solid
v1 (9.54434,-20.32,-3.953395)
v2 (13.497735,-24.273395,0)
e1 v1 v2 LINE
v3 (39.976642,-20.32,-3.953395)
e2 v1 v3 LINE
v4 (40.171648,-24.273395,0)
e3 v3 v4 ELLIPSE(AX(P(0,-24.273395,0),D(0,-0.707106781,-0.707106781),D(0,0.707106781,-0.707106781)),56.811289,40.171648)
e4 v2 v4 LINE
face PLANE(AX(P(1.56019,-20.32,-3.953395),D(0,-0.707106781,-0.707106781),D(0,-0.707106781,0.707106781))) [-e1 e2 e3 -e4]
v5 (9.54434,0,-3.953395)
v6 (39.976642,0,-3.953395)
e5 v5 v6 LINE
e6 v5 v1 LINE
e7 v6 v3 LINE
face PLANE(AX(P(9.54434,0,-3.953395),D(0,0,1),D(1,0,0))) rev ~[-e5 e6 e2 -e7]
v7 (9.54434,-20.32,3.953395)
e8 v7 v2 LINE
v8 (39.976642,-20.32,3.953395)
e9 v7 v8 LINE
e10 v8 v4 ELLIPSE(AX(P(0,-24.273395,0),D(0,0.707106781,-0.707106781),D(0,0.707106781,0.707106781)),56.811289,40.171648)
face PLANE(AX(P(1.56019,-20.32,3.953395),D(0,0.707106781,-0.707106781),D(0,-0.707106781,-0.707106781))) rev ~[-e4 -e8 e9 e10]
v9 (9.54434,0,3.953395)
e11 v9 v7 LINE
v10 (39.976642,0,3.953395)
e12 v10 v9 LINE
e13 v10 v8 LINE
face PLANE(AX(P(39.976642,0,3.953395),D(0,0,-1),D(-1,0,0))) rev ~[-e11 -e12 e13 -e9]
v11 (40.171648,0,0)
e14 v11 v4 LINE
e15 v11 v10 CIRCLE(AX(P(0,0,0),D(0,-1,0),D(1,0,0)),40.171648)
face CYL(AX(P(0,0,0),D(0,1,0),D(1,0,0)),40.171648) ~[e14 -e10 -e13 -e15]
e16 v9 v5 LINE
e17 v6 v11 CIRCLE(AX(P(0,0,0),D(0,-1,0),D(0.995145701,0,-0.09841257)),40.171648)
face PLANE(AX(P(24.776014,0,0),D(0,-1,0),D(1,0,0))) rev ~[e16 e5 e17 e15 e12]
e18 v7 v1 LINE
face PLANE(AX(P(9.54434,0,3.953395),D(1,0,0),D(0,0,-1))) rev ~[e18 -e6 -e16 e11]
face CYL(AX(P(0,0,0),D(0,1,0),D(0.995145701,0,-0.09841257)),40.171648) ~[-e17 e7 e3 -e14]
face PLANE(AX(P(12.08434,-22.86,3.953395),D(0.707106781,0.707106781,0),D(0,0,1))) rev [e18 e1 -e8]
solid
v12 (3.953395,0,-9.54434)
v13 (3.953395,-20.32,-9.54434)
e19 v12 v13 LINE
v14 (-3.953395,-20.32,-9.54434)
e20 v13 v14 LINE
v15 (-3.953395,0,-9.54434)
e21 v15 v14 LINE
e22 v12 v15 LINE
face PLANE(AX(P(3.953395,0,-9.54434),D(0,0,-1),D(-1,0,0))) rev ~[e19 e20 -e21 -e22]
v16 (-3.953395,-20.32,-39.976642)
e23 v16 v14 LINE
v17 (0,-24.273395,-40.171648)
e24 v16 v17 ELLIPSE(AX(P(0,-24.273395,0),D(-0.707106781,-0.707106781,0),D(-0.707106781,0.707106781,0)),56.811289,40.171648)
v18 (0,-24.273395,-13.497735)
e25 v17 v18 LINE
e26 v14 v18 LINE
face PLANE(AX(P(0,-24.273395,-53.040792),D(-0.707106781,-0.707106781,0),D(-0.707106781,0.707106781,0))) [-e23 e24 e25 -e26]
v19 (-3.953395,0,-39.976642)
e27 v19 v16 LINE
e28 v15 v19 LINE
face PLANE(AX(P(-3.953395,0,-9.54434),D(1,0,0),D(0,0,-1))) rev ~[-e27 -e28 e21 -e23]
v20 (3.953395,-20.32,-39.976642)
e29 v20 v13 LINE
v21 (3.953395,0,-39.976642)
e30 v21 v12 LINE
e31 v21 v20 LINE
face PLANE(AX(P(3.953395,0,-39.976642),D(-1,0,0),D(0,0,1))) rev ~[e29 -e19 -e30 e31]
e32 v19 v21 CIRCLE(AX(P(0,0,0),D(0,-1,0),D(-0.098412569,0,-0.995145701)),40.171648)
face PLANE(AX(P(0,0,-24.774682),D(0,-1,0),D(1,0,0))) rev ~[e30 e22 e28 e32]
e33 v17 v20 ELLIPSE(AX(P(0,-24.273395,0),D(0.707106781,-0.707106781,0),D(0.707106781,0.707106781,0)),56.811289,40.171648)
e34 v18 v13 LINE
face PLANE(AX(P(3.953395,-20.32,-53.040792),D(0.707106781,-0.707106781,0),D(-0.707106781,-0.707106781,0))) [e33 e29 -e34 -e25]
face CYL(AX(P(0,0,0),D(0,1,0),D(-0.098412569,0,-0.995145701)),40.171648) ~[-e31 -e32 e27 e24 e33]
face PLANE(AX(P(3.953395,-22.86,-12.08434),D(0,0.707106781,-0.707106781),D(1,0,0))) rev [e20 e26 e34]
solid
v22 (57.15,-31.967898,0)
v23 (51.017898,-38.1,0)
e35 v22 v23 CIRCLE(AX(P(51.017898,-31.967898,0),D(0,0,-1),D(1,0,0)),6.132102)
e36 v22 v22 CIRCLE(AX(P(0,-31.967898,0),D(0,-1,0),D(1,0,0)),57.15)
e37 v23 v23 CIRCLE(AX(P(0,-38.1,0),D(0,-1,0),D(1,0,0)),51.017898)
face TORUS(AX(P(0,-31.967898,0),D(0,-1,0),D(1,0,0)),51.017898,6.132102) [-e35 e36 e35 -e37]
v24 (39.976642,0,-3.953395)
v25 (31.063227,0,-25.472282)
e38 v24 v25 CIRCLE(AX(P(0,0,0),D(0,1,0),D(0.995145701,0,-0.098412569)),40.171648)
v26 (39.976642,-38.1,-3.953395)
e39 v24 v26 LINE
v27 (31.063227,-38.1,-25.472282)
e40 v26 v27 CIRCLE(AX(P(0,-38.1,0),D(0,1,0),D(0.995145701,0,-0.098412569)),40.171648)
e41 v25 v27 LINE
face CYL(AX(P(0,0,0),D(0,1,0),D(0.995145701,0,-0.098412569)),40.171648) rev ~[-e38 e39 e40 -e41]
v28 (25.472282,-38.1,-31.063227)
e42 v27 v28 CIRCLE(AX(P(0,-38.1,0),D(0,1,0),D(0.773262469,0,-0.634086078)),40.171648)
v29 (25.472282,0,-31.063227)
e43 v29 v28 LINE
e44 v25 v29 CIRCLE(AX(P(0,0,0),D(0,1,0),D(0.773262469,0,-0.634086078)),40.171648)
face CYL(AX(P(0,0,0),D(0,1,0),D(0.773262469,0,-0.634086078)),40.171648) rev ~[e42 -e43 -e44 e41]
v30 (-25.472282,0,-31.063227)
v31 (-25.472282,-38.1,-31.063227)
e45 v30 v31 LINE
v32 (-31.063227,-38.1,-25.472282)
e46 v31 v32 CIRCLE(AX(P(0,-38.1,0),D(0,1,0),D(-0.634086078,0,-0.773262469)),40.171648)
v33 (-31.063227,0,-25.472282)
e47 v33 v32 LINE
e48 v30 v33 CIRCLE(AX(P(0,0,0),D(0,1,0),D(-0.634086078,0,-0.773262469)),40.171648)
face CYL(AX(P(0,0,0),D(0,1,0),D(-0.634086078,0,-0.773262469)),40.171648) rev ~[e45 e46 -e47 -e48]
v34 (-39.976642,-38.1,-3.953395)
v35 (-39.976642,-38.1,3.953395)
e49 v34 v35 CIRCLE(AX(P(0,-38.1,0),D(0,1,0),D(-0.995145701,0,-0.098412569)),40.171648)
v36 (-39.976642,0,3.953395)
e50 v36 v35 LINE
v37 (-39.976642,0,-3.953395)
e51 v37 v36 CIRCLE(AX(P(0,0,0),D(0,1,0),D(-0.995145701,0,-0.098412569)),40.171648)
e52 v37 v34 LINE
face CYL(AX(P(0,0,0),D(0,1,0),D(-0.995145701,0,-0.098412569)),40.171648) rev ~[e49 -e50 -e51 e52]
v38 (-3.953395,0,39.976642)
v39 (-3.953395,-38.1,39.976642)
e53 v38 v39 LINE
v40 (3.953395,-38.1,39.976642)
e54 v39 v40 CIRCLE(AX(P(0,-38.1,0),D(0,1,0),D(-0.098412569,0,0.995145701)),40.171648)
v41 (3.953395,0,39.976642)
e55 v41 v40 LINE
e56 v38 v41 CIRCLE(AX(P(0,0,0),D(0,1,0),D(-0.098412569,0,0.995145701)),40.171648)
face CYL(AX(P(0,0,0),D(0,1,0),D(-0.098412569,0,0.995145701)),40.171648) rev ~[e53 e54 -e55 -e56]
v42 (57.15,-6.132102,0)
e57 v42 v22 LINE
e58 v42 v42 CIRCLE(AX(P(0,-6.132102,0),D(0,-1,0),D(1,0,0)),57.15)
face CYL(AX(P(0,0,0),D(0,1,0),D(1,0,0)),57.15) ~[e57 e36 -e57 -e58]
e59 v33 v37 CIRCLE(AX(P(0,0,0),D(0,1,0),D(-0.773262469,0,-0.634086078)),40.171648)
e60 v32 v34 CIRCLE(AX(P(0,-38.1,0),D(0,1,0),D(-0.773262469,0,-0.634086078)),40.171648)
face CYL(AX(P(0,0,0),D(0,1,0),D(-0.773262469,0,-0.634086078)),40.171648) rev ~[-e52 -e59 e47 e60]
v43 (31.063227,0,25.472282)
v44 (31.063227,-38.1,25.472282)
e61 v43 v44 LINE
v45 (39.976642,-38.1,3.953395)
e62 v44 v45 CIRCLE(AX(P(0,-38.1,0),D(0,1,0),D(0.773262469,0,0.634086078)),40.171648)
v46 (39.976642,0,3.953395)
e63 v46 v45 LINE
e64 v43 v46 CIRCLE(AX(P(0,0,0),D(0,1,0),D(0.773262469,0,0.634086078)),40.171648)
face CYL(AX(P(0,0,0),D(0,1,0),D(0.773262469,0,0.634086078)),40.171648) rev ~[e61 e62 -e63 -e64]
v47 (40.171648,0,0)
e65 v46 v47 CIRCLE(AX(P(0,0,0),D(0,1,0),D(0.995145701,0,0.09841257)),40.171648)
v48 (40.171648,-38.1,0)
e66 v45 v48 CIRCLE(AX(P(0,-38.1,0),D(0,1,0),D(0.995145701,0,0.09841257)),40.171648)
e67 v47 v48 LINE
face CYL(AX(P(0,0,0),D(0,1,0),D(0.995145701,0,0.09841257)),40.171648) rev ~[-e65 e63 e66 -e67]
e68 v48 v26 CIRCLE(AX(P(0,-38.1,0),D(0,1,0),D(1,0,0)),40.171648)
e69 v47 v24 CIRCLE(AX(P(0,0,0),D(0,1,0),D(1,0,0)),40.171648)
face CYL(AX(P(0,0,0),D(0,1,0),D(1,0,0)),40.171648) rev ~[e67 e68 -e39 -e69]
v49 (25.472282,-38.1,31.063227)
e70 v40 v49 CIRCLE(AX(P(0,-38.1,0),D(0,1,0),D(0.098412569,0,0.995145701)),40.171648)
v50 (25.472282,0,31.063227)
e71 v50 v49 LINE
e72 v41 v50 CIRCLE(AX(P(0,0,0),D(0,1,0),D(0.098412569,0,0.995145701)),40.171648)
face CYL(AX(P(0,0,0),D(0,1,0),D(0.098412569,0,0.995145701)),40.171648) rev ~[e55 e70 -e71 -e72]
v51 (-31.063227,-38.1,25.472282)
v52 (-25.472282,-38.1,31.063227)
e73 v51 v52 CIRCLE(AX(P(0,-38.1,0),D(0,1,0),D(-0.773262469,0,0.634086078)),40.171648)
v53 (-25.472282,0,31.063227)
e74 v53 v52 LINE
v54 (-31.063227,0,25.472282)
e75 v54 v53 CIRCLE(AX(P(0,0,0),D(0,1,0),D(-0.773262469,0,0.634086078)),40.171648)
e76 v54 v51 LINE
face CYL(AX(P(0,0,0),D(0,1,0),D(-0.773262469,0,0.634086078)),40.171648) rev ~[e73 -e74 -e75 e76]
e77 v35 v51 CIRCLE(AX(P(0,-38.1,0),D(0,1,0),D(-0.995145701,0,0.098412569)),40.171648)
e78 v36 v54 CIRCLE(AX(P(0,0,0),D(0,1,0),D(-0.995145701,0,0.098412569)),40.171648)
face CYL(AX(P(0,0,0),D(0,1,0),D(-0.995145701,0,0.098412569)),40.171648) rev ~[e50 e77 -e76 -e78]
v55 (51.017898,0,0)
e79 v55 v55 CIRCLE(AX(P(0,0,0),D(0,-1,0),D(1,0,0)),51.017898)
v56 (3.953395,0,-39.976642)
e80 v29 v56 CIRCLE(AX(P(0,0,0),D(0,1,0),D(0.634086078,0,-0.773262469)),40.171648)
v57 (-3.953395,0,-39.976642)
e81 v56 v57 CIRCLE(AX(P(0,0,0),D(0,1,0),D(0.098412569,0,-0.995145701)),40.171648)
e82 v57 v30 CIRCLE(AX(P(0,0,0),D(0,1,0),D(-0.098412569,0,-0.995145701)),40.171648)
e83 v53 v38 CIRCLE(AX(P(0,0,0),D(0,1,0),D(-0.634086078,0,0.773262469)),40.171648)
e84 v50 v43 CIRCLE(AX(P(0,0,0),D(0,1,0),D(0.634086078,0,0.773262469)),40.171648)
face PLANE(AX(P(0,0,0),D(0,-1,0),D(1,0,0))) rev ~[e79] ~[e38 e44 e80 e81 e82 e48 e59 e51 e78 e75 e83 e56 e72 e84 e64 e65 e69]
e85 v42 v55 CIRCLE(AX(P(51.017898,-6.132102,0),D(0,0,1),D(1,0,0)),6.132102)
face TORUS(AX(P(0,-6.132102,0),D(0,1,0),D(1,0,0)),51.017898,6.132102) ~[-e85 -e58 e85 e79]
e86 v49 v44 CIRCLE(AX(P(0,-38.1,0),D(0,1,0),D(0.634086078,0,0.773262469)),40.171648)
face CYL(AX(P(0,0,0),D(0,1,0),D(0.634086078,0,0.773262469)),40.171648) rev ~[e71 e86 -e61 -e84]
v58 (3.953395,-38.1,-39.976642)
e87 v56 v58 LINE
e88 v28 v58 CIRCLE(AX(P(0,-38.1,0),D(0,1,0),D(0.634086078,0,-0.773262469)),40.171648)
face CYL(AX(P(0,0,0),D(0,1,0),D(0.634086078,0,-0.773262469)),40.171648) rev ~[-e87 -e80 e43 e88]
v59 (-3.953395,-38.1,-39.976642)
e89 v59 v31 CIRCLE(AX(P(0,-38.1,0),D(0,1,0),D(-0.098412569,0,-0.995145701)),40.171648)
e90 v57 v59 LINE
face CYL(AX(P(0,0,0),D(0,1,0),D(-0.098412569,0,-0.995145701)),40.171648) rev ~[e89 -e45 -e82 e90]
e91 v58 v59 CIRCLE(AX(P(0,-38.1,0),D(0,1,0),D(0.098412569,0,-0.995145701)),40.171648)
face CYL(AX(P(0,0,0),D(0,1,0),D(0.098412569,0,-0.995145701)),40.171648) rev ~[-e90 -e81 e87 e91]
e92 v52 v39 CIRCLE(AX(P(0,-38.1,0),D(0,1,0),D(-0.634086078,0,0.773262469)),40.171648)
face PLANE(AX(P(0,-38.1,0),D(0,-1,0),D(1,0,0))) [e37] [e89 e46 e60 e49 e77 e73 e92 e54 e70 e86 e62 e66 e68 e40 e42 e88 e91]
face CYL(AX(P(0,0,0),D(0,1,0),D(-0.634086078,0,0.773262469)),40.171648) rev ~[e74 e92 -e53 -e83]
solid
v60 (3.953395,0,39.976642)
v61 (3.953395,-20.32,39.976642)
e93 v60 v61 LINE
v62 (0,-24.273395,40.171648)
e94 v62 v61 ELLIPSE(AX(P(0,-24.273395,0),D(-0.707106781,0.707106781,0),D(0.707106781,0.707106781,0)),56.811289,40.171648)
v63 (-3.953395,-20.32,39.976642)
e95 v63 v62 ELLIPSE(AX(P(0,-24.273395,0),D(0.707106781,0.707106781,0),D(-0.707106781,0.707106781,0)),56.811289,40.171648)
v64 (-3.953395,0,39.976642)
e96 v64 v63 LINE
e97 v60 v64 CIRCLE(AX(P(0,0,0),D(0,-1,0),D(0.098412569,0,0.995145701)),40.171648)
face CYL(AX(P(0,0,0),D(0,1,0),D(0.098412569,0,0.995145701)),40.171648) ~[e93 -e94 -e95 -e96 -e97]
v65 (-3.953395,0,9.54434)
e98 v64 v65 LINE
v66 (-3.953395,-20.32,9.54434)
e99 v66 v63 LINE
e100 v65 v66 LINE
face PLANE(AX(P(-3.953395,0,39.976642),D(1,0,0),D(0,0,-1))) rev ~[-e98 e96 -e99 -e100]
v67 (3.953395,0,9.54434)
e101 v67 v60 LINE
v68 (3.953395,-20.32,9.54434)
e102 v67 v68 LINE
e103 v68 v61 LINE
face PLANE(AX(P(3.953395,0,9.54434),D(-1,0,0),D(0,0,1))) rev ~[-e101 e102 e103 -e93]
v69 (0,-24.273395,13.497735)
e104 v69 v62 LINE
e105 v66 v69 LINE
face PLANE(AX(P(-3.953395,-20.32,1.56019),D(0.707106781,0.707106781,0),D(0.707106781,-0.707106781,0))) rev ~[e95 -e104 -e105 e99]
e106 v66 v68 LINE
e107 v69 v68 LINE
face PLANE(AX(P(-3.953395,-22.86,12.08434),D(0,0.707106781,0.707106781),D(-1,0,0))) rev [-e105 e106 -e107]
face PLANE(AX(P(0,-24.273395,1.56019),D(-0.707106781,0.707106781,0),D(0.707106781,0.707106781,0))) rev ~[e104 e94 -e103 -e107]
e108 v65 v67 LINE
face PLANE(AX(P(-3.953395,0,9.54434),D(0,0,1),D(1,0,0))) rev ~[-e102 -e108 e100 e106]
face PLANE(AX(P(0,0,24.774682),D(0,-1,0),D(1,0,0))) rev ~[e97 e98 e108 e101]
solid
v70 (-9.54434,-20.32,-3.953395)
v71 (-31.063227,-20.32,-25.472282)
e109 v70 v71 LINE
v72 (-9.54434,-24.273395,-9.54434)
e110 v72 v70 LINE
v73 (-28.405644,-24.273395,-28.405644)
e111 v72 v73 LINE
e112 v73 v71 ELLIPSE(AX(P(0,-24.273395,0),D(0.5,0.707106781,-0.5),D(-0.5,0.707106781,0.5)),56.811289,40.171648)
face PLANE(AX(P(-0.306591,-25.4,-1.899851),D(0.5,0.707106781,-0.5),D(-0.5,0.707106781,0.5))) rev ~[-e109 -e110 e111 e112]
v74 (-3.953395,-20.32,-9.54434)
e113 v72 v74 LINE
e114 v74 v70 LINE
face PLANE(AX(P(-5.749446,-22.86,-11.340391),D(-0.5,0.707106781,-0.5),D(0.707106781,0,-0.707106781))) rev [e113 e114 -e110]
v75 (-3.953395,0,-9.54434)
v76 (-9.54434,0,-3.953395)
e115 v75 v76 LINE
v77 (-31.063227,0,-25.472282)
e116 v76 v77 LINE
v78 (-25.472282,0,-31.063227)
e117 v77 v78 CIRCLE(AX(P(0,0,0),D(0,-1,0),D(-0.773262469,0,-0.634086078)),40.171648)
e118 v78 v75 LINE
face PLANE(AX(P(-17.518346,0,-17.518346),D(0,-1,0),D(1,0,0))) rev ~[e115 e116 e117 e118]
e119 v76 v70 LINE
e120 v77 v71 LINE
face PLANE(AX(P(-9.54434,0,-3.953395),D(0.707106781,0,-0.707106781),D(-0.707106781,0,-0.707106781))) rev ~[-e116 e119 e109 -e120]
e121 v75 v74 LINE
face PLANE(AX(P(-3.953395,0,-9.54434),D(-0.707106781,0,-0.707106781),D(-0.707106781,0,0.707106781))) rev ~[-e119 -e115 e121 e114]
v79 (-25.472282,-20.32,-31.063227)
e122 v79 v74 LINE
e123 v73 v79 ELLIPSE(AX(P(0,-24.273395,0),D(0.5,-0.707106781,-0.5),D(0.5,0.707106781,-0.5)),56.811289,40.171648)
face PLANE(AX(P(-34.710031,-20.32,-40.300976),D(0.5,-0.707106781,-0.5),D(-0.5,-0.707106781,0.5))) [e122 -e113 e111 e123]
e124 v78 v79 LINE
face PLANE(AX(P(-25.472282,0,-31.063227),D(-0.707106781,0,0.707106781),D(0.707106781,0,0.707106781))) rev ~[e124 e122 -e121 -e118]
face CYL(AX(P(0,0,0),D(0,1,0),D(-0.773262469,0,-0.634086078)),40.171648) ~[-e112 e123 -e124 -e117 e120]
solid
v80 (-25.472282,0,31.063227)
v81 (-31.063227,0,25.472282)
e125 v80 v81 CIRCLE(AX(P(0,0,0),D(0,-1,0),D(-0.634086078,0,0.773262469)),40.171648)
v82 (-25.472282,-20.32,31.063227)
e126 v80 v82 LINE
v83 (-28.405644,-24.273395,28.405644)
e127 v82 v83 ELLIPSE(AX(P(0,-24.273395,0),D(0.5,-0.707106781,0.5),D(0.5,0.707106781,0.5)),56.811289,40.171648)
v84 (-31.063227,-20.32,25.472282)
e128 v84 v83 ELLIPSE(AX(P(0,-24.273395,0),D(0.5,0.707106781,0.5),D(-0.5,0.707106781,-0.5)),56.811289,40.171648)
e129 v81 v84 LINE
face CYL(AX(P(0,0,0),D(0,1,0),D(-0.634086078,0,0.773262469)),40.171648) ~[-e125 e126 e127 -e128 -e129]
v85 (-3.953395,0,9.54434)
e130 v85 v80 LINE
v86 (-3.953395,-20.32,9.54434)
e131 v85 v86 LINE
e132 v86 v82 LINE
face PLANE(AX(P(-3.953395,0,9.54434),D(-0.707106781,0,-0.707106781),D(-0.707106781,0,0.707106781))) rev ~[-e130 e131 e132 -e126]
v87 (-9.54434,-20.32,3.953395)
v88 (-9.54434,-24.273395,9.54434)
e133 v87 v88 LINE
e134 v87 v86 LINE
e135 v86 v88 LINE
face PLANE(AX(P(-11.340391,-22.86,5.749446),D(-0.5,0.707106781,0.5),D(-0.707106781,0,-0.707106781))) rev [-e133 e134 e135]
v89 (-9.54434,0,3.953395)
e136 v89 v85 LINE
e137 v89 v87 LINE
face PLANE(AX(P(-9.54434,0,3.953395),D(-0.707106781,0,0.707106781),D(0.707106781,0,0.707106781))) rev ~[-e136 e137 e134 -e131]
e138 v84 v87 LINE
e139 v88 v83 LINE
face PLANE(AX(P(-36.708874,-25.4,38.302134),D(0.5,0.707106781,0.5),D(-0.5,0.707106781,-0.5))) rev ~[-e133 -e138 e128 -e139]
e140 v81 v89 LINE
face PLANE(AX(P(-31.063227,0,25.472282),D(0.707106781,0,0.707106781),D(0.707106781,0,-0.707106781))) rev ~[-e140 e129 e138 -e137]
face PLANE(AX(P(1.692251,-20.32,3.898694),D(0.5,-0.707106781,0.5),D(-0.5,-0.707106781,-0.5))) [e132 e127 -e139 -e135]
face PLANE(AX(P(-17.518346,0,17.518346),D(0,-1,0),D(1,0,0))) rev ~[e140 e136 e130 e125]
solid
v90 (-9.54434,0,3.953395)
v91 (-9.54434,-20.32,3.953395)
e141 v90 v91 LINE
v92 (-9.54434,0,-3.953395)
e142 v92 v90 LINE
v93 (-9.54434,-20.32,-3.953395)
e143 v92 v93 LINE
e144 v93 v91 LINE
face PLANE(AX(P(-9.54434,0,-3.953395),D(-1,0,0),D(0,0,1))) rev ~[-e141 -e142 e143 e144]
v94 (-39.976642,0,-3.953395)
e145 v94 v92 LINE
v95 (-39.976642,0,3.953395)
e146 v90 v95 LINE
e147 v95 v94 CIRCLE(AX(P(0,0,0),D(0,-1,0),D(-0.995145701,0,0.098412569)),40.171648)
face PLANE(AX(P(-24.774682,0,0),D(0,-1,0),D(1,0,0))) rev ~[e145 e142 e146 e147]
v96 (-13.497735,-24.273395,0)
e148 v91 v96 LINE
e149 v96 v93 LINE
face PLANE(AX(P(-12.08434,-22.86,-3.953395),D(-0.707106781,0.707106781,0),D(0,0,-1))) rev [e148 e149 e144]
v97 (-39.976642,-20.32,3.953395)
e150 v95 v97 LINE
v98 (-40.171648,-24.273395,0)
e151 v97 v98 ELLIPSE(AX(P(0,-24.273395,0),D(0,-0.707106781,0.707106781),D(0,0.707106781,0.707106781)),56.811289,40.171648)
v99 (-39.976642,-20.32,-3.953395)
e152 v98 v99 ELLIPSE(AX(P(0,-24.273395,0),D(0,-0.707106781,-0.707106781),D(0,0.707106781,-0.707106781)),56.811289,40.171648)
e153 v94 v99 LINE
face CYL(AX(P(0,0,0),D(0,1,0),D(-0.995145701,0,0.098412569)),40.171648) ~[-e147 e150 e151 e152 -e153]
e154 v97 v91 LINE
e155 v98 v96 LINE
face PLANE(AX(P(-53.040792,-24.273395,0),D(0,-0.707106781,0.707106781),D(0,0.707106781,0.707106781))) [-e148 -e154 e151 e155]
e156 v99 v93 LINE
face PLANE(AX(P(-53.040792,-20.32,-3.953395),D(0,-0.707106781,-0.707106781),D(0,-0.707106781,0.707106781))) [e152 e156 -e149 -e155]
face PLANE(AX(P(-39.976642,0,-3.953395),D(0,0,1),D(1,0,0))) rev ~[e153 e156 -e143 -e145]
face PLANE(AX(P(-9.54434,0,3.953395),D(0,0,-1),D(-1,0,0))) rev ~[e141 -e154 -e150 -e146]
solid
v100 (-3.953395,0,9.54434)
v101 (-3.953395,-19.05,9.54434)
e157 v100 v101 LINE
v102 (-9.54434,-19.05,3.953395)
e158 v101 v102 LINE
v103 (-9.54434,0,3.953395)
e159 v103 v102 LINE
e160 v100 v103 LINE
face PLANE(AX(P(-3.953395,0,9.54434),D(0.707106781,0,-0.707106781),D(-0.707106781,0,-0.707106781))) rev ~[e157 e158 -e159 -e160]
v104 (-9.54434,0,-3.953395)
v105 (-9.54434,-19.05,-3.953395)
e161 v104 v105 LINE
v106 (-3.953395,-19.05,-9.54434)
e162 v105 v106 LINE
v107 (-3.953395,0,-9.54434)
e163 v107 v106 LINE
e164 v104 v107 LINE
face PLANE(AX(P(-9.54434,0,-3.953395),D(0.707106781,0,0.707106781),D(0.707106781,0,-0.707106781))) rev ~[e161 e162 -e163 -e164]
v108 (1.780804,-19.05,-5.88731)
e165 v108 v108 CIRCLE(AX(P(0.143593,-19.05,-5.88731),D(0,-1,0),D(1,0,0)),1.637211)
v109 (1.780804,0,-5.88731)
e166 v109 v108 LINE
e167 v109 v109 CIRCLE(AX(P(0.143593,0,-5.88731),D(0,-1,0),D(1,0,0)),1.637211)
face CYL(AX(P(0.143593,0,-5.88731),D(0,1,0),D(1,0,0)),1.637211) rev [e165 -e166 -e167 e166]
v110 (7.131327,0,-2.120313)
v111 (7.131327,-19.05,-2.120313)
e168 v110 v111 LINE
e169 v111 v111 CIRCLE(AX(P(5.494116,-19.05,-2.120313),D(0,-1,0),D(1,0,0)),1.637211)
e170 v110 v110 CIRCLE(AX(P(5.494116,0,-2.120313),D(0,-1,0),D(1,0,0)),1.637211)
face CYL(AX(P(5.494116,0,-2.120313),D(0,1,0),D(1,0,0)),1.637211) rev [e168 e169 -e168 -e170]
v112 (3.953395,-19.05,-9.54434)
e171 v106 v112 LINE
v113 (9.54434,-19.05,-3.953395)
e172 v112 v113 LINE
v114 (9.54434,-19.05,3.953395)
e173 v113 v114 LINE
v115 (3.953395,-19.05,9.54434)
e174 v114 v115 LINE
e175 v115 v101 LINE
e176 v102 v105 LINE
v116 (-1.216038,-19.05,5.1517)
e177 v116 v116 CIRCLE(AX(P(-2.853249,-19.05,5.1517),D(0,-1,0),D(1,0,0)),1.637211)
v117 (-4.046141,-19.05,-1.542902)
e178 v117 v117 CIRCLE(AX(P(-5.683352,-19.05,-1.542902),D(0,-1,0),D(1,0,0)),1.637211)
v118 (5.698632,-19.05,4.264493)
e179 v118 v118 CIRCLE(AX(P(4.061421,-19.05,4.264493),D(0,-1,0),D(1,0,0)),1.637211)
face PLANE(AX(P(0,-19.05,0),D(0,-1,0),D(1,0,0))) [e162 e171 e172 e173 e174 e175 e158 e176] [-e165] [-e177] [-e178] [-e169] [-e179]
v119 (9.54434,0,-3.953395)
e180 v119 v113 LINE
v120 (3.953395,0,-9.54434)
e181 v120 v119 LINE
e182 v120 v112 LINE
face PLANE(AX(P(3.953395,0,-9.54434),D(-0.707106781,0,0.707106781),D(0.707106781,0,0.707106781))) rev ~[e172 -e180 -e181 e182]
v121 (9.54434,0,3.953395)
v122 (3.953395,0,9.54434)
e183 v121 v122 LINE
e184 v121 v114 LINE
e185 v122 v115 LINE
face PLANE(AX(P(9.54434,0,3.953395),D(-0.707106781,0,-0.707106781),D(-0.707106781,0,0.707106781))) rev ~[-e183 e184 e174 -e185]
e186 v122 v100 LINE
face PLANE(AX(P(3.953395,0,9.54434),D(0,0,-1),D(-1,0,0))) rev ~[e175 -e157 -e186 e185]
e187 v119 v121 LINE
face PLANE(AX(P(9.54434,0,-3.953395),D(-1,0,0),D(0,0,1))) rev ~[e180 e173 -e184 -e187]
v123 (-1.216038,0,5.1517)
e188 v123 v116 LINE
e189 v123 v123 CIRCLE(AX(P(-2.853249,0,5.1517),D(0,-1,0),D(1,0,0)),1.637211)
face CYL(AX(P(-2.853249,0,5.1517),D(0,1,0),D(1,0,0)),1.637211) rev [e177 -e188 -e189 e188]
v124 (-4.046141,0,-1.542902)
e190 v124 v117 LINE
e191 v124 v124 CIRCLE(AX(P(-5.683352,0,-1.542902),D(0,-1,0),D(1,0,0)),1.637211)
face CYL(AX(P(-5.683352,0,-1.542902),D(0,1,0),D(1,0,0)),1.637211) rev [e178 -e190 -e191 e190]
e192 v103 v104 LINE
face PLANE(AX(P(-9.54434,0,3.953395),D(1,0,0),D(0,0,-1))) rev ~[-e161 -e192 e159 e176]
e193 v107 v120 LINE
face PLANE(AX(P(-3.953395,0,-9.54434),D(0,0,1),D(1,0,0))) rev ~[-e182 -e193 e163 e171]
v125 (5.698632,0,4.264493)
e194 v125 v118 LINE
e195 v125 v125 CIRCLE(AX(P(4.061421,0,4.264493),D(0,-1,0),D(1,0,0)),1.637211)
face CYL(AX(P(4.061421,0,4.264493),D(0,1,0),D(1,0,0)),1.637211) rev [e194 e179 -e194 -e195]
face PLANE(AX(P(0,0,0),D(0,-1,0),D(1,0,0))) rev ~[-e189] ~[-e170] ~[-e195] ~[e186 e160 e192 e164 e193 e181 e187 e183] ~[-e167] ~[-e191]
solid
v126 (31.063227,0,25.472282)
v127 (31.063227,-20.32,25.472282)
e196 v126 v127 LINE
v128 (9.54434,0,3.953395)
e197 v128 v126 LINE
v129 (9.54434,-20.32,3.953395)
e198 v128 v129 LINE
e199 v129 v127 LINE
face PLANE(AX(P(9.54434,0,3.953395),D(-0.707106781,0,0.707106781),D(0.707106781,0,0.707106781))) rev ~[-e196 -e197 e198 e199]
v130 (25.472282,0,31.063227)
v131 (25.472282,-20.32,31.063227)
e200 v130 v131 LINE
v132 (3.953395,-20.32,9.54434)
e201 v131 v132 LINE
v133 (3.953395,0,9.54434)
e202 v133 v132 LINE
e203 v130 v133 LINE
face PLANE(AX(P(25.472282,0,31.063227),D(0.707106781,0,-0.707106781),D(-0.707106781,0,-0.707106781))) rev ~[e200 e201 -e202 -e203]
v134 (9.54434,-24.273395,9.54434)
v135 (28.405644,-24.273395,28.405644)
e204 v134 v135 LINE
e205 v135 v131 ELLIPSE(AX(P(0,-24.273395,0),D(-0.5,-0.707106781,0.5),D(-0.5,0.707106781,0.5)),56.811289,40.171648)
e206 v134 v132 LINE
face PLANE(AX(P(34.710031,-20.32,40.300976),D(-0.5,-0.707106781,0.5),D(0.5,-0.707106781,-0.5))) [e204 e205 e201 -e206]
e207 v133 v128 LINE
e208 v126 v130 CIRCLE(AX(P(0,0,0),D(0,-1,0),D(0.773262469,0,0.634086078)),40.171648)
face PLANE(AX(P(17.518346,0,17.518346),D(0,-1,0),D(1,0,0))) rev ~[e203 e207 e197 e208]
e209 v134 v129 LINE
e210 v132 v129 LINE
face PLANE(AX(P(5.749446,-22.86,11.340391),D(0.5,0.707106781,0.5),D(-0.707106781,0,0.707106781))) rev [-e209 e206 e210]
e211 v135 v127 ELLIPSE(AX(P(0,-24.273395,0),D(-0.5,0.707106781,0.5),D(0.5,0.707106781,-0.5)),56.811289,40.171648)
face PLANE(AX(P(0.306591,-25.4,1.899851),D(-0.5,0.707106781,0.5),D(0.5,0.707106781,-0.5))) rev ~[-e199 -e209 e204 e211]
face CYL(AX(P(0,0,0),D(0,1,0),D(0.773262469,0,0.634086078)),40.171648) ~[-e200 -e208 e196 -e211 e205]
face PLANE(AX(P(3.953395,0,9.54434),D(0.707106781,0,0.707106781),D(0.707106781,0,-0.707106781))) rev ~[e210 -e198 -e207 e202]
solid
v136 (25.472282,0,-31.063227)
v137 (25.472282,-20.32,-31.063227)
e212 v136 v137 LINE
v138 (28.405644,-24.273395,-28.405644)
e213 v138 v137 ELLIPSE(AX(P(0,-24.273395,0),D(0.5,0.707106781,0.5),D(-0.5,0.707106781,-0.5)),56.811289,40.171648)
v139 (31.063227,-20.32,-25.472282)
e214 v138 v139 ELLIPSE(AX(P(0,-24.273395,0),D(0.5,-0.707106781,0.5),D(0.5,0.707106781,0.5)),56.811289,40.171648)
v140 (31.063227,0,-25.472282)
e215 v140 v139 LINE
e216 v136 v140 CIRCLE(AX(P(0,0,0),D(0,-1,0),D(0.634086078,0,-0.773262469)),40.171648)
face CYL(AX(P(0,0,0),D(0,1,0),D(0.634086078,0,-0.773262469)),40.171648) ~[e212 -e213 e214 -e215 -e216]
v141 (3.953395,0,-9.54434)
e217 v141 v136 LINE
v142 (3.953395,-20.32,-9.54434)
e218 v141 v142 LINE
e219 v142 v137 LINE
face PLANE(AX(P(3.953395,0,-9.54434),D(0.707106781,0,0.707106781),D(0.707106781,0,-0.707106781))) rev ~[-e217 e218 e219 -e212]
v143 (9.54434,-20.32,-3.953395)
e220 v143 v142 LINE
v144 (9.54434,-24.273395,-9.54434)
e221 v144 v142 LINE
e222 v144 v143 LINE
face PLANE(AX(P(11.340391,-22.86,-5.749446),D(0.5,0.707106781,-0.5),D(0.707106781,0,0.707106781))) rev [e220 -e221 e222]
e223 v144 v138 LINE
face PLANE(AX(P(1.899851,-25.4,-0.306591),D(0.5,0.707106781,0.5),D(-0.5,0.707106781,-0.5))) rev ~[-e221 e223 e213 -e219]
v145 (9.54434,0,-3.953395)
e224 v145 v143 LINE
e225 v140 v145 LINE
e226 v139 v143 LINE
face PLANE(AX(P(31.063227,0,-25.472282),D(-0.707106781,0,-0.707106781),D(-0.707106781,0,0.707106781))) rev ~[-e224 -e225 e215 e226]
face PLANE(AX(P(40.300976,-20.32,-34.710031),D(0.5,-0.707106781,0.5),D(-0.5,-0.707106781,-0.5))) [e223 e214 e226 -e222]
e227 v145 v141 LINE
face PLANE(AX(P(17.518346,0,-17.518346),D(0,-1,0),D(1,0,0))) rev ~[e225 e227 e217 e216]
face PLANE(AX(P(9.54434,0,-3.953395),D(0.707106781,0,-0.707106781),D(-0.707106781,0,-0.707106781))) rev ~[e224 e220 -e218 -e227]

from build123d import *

# Parameters (mm, degrees)
F0_R          = 57.15
F1_DEPTH      = 38.1
F2_DEPTH      = 25.4
F0_R_2        = 1.6372110105
F3_DEPTH      = 19.05
F4_R          = 6.1321024484
F5_SIZE       = 5.08
F5_2_SIZE     = 5.08
F5_3_SIZE     = 5.08
F5_4_SIZE     = 5.08
F5_5_SIZE     = 5.08
F5_6_SIZE     = 5.08
F5_7_SIZE     = 5.08
F5_8_SIZE     = 5.08
F6_T1_DEPTH   = 51.4806015581
F6_2_T1_DEPTH = 51.4806015581
F6_2_T3_DEPTH = 51.4806015581
F6_3_T1_DEPTH = 51.4806015581
F6_4_T1_DEPTH = 51.4806015581
F6_4_T3_DEPTH = 51.4806015581
F6_5_T1_DEPTH = 51.4806015581
F6_6_T1_DEPTH = 51.4806015581
F6_6_T3_DEPTH = 51.4806015581
F6_7_T1_DEPTH = 51.4806015581
F6_8_T1_DEPTH = 51.4806015581
F6_8_T3_DEPTH = 51.4806015581


# Not quite as in the source:
# - a fillet or chamfer that OpenCascade refuses, or shapes differently, is made with other operations: its cross-section is extruded or revolved along the edge and cut away or added


with BuildPart() as f1:
    # F0 (on Front) → F1 (new body)
    with BuildSketch(Plane.XZ):
        Circle(F0_R)
        with BuildLine():
            ThreePointArc((39.9766423626, 3.9533950563), (40.1228666372, 1.979100774), (40.1716475522, 0))
            ThreePointArc((40.1716475522, 0), (40.1228666372, -1.979100774), (39.9766423626, -3.9533950563))
            ThreePointArc((39.9766423626, -3.9533950563), (37.1137629608, -15.3730239691), (31.0632273567, -25.4722824507))
            ThreePointArc((31.0632273567, -25.4722824507), (28.4056443956, -28.4056443956), (25.4722824507, -31.0632273567))
            ThreePointArc((25.4722824507, -31.0632273567), (15.3730239691, -37.1137629608), (3.9533950563, -39.9766423626))
            ThreePointArc((3.9533950563, -39.9766423626), (0, -40.1716475522), (-3.9533950563, -39.9766423626))
            ThreePointArc((-3.9533950563, -39.9766423626), (-15.3730239691, -37.1137629608), (-25.4722824507, -31.0632273567))
            ThreePointArc((-25.4722824507, -31.0632273567), (-28.4056443956, -28.4056443956), (-31.0632273567, -25.4722824507))
            ThreePointArc((-31.0632273567, -25.4722824507), (-37.1137629608, -15.3730239691), (-39.9766423626, -3.9533950563))
            ThreePointArc((-39.9766423626, -3.9533950563), (-40.1716475522, 0), (-39.9766423626, 3.9533950563))
            ThreePointArc((-39.9766423626, 3.9533950563), (-37.1137629608, 15.3730239691), (-31.0632273567, 25.4722824507))
            ThreePointArc((-31.0632273567, 25.4722824507), (-28.4056443956, 28.4056443956), (-25.4722824507, 31.0632273567))
            ThreePointArc((-25.4722824507, 31.0632273567), (-15.3730239691, 37.1137629608), (-3.9533950563, 39.9766423626))
            ThreePointArc((-3.9533950563, 39.9766423626), (0, 40.1716475522), (3.9533950563, 39.9766423626))
            ThreePointArc((3.9533950563, 39.9766423626), (15.3730239691, 37.1137629608), (25.4722824507, 31.0632273567))
            ThreePointArc((25.4722824507, 31.0632273567), (28.4056443956, 28.4056443956), (31.0632273567, 25.4722824507))
            ThreePointArc((31.0632273567, 25.4722824507), (37.1137629608, 15.3730239691), (39.9766423626, 3.9533950563))
        make_face(mode=Mode.SUBTRACT)
    extrude(amount=F1_DEPTH)

    # F4
    f4_edges = [f1.edges().sort_by_distance(p)[0] for p in [
        (-57.15, -38.1, 0),
        (-57.15, 0, 0),
    ]]
    fillet(f4_edges, radius=F4_R)


with BuildPart() as f2:
    # F0 (on Front) → F2 (new body)
    with BuildSketch(Plane.XZ):
        with BuildLine():
            Line((-9.5443399623, -3.9533950563), (-9.5443399623, 3.9533950563))
            Line((-9.5443399623, 3.9533950563), (-39.9766423626, 3.9533950563))
            ThreePointArc((-39.9766423626, 3.9533950563), (-40.1716475522, 0), (-39.9766423626, -3.9533950563))
            Line((-39.9766423626, -3.9533950563), (-9.5443399623, -3.9533950563))
        make_face()
    extrude(amount=F2_DEPTH)

    # F5#4
    f5_4_edges = [f2.edges().sort_by_distance(p)[0] for p in [
        (-9.54434, -25.4, 0),
    ]]
    chamfer(f5_4_edges, length=F5_4_SIZE)

    # F6#3: chamfer of 5.08 on 2 edges, made by hand

    # F6_3_s2 → F6_3_t1 (cut)
    with BuildSketch(Plane.YZ.offset(-53.0407919415)):
        Polygon((-25.4, -1.1266049437), (-20.32, 3.9533950563), (-25.4, 3.9533950563), align=None)
        Polygon((-20.32, -3.9533950563), (-25.4, 1.1266049437), (-25.4, -3.9533950563), align=None)
    extrude(amount=F6_3_T1_DEPTH, mode=Mode.SUBTRACT)


with BuildPart() as f2b:
    # F0 (on Front) → F2, piece 2 (new body)
    with BuildSketch(Plane.XZ):
        with BuildLine():
            Line((-9.5443399623, 3.9533950563), (-3.9533950563, 9.5443399623))
            Line((-3.9533950563, 9.5443399623), (-25.4722824507, 31.0632273567))
            ThreePointArc((-25.4722824507, 31.0632273567), (-28.4056443956, 28.4056443956), (-31.0632273567, 25.4722824507))
            Line((-31.0632273567, 25.4722824507), (-9.5443399623, 3.9533950563))
        make_face()
    extrude(amount=F2_DEPTH)

    # F5#3
    f5_3_edges = [f2b.edges().sort_by_distance(p)[0] for p in [
        (-6.748868, -25.4, 6.748868),
    ]]
    chamfer(f5_3_edges, length=F5_3_SIZE)

    # F6#2: chamfer of 5.08 on 2 edges, made by hand

    # F6_2_s2 → F6_2_t1 (cut)
    with BuildSketch(Plane(origin=(-1.1032212001, 0, 1.1032212001), x_dir=(0, 1, 0), z_dir=(-0.7071067812, 0, 0.7071067812))):
        Polygon((-20.32, -3.9533950563), (-25.4, 1.1266049437), (-25.4, -3.9533950563), align=None)
    extrude(amount=F6_2_T1_DEPTH, mode=Mode.SUBTRACT)

    # F6_2_s4 → F6_2_t3 (cut)
    with BuildSketch(Plane(origin=(-37.5055036613, 0, 37.5055036613), x_dir=(0, 1, 0), z_dir=(0.7071067812, 0, -0.7071067812))):
        Polygon((-25.4, 1.1266049437), (-20.32, -3.9533950563), (-25.4, -3.9533950563), align=None)
    extrude(amount=F6_2_T3_DEPTH, mode=Mode.SUBTRACT)


with BuildPart() as f2c:
    # F0 (on Front) → F2, piece 3 (new body)
    with BuildSketch(Plane.XZ):
        with BuildLine():
            Line((9.5443399623, 3.9533950563), (31.0632273567, 25.4722824507))
            ThreePointArc((31.0632273567, 25.4722824507), (28.4056443956, 28.4056443956), (25.4722824507, 31.0632273567))
            Line((25.4722824507, 31.0632273567), (3.9533950563, 9.5443399623))
            Line((3.9533950563, 9.5443399623), (9.5443399623, 3.9533950563))
        make_face()
    extrude(amount=F2_DEPTH)

    # F5
    f5_edges = [f2c.edges().sort_by_distance(p)[0] for p in [
        (6.748868, -25.4, 6.748868),
    ]]
    chamfer(f5_edges, length=F5_SIZE)

    # F6#8: chamfer of 5.08 on 2 edges, made by hand

    # F6_8_s2 → F6_8_t1 (cut)
    with BuildSketch(Plane(origin=(1.1032212001, 0, 1.1032212001), x_dir=(0, 1, 0), z_dir=(0.7071067812, 0, 0.7071067812))):
        Polygon((-25.4, 1.1266049437), (-20.32, -3.9533950563), (-25.4, -3.9533950563), align=None)
    extrude(amount=F6_8_T1_DEPTH, mode=Mode.SUBTRACT)

    # F6_8_s4 → F6_8_t3 (cut)
    with BuildSketch(Plane(origin=(37.5055036613, 0, 37.5055036613), x_dir=(0, 1, 0), z_dir=(-0.7071067812, 0, -0.7071067812))):
        Polygon((-20.32, -3.9533950563), (-25.4, 1.1266049437), (-25.4, -3.9533950563), align=None)
    extrude(amount=F6_8_T3_DEPTH, mode=Mode.SUBTRACT)


with BuildPart() as f2d:
    # F0 (on Front) → F2, piece 4 (new body)
    with BuildSketch(Plane.XZ):
        with BuildLine():
            Line((-3.9533950563, 9.5443399623), (3.9533950563, 9.5443399623))
            Line((3.9533950563, 9.5443399623), (3.9533950563, 39.9766423626))
            ThreePointArc((3.9533950563, 39.9766423626), (0, 40.1716475522), (-3.9533950563, 39.9766423626))
            Line((-3.9533950563, 39.9766423626), (-3.9533950563, 9.5443399623))
        make_face()
    extrude(amount=F2_DEPTH)

    # F5#2
    f5_2_edges = [f2d.edges().sort_by_distance(p)[0] for p in [
        (0, -25.4, 9.54434),
    ]]
    chamfer(f5_2_edges, length=F5_2_SIZE)

    # F6: chamfer of 5.08 on 2 edges, made by hand

    # F6_s2 → F6_t1 (cut)
    with BuildSketch(Plane.XY.offset(1.5601903834)):
        Polygon((-3.9533950563, -20.32), (1.1266049437, -25.4), (-3.9533950563, -25.4), align=None)
        Polygon((-1.1266049437, -25.4), (3.9533950563, -20.32), (3.9533950563, -25.4), align=None)
    extrude(amount=F6_T1_DEPTH, mode=Mode.SUBTRACT)


with BuildPart() as f2e:
    # F0 (on Front) → F2, piece 5 (new body)
    with BuildSketch(Plane.XZ):
        with BuildLine():
            ThreePointArc((39.9766423626, -3.9533950563), (40.1228666372, -1.979100774), (40.1716475522, 0))
            ThreePointArc((40.1716475522, 0), (40.1228666372, 1.979100774), (39.9766423626, 3.9533950563))
            Line((39.9766423626, 3.9533950563), (9.5443399623, 3.9533950563))
            Line((9.5443399623, 3.9533950563), (9.5443399623, -3.9533950563))
            Line((9.5443399623, -3.9533950563), (39.9766423626, -3.9533950563))
        make_face()
    extrude(amount=F2_DEPTH)

    # F5#8
    f5_8_edges = [f2e.edges().sort_by_distance(p)[0] for p in [
        (9.54434, -25.4, 0),
    ]]
    chamfer(f5_8_edges, length=F5_8_SIZE)

    # F6#7: chamfer of 5.08 on 2 edges, made by hand

    # F6_7_s2 → F6_7_t1 (cut)
    with BuildSketch(Plane.YZ.offset(1.5601903834)):
        Polygon((-20.32, -3.9533950563), (-25.4, 1.1266049437), (-25.4, -3.9533950563), align=None)
        Polygon((-20.32, 3.9533950563), (-25.4, -1.1266049437), (-25.4, 3.9533950563), align=None)
    extrude(amount=F6_7_T1_DEPTH, mode=Mode.SUBTRACT)


with BuildPart() as f2f:
    # F0 (on Front) → F2, piece 6 (new body)
    with BuildSketch(Plane.XZ):
        with BuildLine():
            ThreePointArc((25.4722824507, -31.0632273567), (28.4056443956, -28.4056443956), (31.0632273567, -25.4722824507))
            Line((31.0632273567, -25.4722824507), (9.5443399623, -3.9533950563))
            Line((9.5443399623, -3.9533950563), (3.9533950563, -9.5443399623))
            Line((3.9533950563, -9.5443399623), (25.4722824507, -31.0632273567))
        make_face()
    extrude(amount=F2_DEPTH)

    # F5#7
    f5_7_edges = [f2f.edges().sort_by_distance(p)[0] for p in [
        (6.748868, -25.4, -6.748868),
    ]]
    chamfer(f5_7_edges, length=F5_7_SIZE)

    # F6#6: chamfer of 5.08 on 2 edges, made by hand

    # F6_6_s2 → F6_6_t1 (cut)
    with BuildSketch(Plane(origin=(1.1032212001, 0, -1.1032212001), x_dir=(0, 1, 0), z_dir=(0.7071067812, 0, -0.7071067812))):
        Polygon((-25.4, 1.1266049437), (-20.32, -3.9533950563), (-25.4, -3.9533950563), align=None)
    extrude(amount=F6_6_T1_DEPTH, mode=Mode.SUBTRACT)

    # F6_6_s4 → F6_6_t3 (cut)
    with BuildSketch(Plane(origin=(37.5055036613, 0, -37.5055036613), x_dir=(0, 1, 0), z_dir=(-0.7071067812, 0, 0.7071067812))):
        Polygon((-20.32, -3.9533950563), (-25.4, 1.1266049437), (-25.4, -3.9533950563), align=None)
    extrude(amount=F6_6_T3_DEPTH, mode=Mode.SUBTRACT)


with BuildPart() as f2g:
    # F0 (on Front) → F2, piece 7 (new body)
    with BuildSketch(Plane.XZ):
        with BuildLine():
            Line((3.9533950563, -39.9766423626), (3.9533950563, -9.5443399623))
            Line((3.9533950563, -9.5443399623), (-3.9533950563, -9.5443399623))
            Line((-3.9533950563, -9.5443399623), (-3.9533950563, -39.9766423626))
            ThreePointArc((-3.9533950563, -39.9766423626), (0, -40.1716475522), (3.9533950563, -39.9766423626))
        make_face()
    extrude(amount=F2_DEPTH)

    # F5#6
    f5_6_edges = [f2g.edges().sort_by_distance(p)[0] for p in [
        (0, -25.4, -9.54434),
    ]]
    chamfer(f5_6_edges, length=F5_6_SIZE)

    # F6#5: chamfer of 5.08 on 2 edges, made by hand

    # F6_5_s2 → F6_5_t1 (cut)
    with BuildSketch(Plane.XY.offset(-53.0407919415)):
        Polygon((1.1266049437, -25.4), (-3.9533950563, -20.32), (-3.9533950563, -25.4), align=None)
        Polygon((3.9533950563, -20.32), (-1.1266049437, -25.4), (3.9533950563, -25.4), align=None)
    extrude(amount=F6_5_T1_DEPTH, mode=Mode.SUBTRACT)


with BuildPart() as f2h:
    # F0 (on Front) → F2, piece 8 (new body)
    with BuildSketch(Plane.XZ):
        with BuildLine():
            Line((-25.4722824507, -31.0632273567), (-3.9533950563, -9.5443399623))
            Line((-3.9533950563, -9.5443399623), (-9.5443399623, -3.9533950563))
            Line((-9.5443399623, -3.9533950563), (-31.0632273567, -25.4722824507))
            ThreePointArc((-31.0632273567, -25.4722824507), (-28.4056443956, -28.4056443956), (-25.4722824507, -31.0632273567))
        make_face()
    extrude(amount=F2_DEPTH)

    # F5#5
    f5_5_edges = [f2h.edges().sort_by_distance(p)[0] for p in [
        (-6.748868, -25.4, -6.748868),
    ]]
    chamfer(f5_5_edges, length=F5_5_SIZE)

    # F6#4: chamfer of 5.08 on 2 edges, made by hand

    # F6_4_s2 → F6_4_t1 (cut)
    with BuildSketch(Plane(origin=(-1.1032212001, 0, -1.1032212001), x_dir=(0, 1, 0), z_dir=(-0.7071067812, 0, -0.7071067812))):
        Polygon((-25.4, 1.1266049437), (-20.32, -3.9533950563), (-25.4, -3.9533950563), align=None)
    extrude(amount=F6_4_T1_DEPTH, mode=Mode.SUBTRACT)

    # F6_4_s4 → F6_4_t3 (cut)
    with BuildSketch(Plane(origin=(-37.5055036613, 0, -37.5055036613), x_dir=(0, 1, 0), z_dir=(0.7071067812, 0, 0.7071067812))):
        Polygon((-20.32, -3.9533950563), (-25.4, 1.1266049437), (-25.4, -3.9533950563), align=None)
    extrude(amount=F6_4_T3_DEPTH, mode=Mode.SUBTRACT)


with BuildPart() as f3:
    # F0 (on Front) → F3 (new body)
    with BuildSketch(Plane.XZ):
        Polygon((9.5443399623, -3.9533950563), (9.5443399623, 3.9533950563), (3.9533950563, 9.5443399623), (-3.9533950563, 9.5443399623), (-9.5443399623, 3.9533950563), (-9.5443399623, -3.9533950563), (-3.9533950563, -9.5443399623), (3.9533950563, -9.5443399623), align=None)
        with Locations((-5.6833523544, -1.5429019004)):
            Circle(F0_R_2, mode=Mode.SUBTRACT)
        with Locations((0.1435929958, -5.8873101931)):
            Circle(F0_R_2, mode=Mode.SUBTRACT)
        with Locations((5.4941160495, -2.1203134423)):
            Circle(F0_R_2, mode=Mode.SUBTRACT)
        with Locations((-2.8532490643, 5.1516997229)):
            Circle(F0_R_2, mode=Mode.SUBTRACT)
        with Locations((4.0614213794, 4.2644925416)):
            Circle(F0_R_2, mode=Mode.SUBTRACT)
    extrude(amount=F3_DEPTH)


solid = Compound([f1.part, f2.part, f2b.part, f2c.part, f2d.part, f2e.part, f2f.part, f2g.part, f2h.part, f3.part])
